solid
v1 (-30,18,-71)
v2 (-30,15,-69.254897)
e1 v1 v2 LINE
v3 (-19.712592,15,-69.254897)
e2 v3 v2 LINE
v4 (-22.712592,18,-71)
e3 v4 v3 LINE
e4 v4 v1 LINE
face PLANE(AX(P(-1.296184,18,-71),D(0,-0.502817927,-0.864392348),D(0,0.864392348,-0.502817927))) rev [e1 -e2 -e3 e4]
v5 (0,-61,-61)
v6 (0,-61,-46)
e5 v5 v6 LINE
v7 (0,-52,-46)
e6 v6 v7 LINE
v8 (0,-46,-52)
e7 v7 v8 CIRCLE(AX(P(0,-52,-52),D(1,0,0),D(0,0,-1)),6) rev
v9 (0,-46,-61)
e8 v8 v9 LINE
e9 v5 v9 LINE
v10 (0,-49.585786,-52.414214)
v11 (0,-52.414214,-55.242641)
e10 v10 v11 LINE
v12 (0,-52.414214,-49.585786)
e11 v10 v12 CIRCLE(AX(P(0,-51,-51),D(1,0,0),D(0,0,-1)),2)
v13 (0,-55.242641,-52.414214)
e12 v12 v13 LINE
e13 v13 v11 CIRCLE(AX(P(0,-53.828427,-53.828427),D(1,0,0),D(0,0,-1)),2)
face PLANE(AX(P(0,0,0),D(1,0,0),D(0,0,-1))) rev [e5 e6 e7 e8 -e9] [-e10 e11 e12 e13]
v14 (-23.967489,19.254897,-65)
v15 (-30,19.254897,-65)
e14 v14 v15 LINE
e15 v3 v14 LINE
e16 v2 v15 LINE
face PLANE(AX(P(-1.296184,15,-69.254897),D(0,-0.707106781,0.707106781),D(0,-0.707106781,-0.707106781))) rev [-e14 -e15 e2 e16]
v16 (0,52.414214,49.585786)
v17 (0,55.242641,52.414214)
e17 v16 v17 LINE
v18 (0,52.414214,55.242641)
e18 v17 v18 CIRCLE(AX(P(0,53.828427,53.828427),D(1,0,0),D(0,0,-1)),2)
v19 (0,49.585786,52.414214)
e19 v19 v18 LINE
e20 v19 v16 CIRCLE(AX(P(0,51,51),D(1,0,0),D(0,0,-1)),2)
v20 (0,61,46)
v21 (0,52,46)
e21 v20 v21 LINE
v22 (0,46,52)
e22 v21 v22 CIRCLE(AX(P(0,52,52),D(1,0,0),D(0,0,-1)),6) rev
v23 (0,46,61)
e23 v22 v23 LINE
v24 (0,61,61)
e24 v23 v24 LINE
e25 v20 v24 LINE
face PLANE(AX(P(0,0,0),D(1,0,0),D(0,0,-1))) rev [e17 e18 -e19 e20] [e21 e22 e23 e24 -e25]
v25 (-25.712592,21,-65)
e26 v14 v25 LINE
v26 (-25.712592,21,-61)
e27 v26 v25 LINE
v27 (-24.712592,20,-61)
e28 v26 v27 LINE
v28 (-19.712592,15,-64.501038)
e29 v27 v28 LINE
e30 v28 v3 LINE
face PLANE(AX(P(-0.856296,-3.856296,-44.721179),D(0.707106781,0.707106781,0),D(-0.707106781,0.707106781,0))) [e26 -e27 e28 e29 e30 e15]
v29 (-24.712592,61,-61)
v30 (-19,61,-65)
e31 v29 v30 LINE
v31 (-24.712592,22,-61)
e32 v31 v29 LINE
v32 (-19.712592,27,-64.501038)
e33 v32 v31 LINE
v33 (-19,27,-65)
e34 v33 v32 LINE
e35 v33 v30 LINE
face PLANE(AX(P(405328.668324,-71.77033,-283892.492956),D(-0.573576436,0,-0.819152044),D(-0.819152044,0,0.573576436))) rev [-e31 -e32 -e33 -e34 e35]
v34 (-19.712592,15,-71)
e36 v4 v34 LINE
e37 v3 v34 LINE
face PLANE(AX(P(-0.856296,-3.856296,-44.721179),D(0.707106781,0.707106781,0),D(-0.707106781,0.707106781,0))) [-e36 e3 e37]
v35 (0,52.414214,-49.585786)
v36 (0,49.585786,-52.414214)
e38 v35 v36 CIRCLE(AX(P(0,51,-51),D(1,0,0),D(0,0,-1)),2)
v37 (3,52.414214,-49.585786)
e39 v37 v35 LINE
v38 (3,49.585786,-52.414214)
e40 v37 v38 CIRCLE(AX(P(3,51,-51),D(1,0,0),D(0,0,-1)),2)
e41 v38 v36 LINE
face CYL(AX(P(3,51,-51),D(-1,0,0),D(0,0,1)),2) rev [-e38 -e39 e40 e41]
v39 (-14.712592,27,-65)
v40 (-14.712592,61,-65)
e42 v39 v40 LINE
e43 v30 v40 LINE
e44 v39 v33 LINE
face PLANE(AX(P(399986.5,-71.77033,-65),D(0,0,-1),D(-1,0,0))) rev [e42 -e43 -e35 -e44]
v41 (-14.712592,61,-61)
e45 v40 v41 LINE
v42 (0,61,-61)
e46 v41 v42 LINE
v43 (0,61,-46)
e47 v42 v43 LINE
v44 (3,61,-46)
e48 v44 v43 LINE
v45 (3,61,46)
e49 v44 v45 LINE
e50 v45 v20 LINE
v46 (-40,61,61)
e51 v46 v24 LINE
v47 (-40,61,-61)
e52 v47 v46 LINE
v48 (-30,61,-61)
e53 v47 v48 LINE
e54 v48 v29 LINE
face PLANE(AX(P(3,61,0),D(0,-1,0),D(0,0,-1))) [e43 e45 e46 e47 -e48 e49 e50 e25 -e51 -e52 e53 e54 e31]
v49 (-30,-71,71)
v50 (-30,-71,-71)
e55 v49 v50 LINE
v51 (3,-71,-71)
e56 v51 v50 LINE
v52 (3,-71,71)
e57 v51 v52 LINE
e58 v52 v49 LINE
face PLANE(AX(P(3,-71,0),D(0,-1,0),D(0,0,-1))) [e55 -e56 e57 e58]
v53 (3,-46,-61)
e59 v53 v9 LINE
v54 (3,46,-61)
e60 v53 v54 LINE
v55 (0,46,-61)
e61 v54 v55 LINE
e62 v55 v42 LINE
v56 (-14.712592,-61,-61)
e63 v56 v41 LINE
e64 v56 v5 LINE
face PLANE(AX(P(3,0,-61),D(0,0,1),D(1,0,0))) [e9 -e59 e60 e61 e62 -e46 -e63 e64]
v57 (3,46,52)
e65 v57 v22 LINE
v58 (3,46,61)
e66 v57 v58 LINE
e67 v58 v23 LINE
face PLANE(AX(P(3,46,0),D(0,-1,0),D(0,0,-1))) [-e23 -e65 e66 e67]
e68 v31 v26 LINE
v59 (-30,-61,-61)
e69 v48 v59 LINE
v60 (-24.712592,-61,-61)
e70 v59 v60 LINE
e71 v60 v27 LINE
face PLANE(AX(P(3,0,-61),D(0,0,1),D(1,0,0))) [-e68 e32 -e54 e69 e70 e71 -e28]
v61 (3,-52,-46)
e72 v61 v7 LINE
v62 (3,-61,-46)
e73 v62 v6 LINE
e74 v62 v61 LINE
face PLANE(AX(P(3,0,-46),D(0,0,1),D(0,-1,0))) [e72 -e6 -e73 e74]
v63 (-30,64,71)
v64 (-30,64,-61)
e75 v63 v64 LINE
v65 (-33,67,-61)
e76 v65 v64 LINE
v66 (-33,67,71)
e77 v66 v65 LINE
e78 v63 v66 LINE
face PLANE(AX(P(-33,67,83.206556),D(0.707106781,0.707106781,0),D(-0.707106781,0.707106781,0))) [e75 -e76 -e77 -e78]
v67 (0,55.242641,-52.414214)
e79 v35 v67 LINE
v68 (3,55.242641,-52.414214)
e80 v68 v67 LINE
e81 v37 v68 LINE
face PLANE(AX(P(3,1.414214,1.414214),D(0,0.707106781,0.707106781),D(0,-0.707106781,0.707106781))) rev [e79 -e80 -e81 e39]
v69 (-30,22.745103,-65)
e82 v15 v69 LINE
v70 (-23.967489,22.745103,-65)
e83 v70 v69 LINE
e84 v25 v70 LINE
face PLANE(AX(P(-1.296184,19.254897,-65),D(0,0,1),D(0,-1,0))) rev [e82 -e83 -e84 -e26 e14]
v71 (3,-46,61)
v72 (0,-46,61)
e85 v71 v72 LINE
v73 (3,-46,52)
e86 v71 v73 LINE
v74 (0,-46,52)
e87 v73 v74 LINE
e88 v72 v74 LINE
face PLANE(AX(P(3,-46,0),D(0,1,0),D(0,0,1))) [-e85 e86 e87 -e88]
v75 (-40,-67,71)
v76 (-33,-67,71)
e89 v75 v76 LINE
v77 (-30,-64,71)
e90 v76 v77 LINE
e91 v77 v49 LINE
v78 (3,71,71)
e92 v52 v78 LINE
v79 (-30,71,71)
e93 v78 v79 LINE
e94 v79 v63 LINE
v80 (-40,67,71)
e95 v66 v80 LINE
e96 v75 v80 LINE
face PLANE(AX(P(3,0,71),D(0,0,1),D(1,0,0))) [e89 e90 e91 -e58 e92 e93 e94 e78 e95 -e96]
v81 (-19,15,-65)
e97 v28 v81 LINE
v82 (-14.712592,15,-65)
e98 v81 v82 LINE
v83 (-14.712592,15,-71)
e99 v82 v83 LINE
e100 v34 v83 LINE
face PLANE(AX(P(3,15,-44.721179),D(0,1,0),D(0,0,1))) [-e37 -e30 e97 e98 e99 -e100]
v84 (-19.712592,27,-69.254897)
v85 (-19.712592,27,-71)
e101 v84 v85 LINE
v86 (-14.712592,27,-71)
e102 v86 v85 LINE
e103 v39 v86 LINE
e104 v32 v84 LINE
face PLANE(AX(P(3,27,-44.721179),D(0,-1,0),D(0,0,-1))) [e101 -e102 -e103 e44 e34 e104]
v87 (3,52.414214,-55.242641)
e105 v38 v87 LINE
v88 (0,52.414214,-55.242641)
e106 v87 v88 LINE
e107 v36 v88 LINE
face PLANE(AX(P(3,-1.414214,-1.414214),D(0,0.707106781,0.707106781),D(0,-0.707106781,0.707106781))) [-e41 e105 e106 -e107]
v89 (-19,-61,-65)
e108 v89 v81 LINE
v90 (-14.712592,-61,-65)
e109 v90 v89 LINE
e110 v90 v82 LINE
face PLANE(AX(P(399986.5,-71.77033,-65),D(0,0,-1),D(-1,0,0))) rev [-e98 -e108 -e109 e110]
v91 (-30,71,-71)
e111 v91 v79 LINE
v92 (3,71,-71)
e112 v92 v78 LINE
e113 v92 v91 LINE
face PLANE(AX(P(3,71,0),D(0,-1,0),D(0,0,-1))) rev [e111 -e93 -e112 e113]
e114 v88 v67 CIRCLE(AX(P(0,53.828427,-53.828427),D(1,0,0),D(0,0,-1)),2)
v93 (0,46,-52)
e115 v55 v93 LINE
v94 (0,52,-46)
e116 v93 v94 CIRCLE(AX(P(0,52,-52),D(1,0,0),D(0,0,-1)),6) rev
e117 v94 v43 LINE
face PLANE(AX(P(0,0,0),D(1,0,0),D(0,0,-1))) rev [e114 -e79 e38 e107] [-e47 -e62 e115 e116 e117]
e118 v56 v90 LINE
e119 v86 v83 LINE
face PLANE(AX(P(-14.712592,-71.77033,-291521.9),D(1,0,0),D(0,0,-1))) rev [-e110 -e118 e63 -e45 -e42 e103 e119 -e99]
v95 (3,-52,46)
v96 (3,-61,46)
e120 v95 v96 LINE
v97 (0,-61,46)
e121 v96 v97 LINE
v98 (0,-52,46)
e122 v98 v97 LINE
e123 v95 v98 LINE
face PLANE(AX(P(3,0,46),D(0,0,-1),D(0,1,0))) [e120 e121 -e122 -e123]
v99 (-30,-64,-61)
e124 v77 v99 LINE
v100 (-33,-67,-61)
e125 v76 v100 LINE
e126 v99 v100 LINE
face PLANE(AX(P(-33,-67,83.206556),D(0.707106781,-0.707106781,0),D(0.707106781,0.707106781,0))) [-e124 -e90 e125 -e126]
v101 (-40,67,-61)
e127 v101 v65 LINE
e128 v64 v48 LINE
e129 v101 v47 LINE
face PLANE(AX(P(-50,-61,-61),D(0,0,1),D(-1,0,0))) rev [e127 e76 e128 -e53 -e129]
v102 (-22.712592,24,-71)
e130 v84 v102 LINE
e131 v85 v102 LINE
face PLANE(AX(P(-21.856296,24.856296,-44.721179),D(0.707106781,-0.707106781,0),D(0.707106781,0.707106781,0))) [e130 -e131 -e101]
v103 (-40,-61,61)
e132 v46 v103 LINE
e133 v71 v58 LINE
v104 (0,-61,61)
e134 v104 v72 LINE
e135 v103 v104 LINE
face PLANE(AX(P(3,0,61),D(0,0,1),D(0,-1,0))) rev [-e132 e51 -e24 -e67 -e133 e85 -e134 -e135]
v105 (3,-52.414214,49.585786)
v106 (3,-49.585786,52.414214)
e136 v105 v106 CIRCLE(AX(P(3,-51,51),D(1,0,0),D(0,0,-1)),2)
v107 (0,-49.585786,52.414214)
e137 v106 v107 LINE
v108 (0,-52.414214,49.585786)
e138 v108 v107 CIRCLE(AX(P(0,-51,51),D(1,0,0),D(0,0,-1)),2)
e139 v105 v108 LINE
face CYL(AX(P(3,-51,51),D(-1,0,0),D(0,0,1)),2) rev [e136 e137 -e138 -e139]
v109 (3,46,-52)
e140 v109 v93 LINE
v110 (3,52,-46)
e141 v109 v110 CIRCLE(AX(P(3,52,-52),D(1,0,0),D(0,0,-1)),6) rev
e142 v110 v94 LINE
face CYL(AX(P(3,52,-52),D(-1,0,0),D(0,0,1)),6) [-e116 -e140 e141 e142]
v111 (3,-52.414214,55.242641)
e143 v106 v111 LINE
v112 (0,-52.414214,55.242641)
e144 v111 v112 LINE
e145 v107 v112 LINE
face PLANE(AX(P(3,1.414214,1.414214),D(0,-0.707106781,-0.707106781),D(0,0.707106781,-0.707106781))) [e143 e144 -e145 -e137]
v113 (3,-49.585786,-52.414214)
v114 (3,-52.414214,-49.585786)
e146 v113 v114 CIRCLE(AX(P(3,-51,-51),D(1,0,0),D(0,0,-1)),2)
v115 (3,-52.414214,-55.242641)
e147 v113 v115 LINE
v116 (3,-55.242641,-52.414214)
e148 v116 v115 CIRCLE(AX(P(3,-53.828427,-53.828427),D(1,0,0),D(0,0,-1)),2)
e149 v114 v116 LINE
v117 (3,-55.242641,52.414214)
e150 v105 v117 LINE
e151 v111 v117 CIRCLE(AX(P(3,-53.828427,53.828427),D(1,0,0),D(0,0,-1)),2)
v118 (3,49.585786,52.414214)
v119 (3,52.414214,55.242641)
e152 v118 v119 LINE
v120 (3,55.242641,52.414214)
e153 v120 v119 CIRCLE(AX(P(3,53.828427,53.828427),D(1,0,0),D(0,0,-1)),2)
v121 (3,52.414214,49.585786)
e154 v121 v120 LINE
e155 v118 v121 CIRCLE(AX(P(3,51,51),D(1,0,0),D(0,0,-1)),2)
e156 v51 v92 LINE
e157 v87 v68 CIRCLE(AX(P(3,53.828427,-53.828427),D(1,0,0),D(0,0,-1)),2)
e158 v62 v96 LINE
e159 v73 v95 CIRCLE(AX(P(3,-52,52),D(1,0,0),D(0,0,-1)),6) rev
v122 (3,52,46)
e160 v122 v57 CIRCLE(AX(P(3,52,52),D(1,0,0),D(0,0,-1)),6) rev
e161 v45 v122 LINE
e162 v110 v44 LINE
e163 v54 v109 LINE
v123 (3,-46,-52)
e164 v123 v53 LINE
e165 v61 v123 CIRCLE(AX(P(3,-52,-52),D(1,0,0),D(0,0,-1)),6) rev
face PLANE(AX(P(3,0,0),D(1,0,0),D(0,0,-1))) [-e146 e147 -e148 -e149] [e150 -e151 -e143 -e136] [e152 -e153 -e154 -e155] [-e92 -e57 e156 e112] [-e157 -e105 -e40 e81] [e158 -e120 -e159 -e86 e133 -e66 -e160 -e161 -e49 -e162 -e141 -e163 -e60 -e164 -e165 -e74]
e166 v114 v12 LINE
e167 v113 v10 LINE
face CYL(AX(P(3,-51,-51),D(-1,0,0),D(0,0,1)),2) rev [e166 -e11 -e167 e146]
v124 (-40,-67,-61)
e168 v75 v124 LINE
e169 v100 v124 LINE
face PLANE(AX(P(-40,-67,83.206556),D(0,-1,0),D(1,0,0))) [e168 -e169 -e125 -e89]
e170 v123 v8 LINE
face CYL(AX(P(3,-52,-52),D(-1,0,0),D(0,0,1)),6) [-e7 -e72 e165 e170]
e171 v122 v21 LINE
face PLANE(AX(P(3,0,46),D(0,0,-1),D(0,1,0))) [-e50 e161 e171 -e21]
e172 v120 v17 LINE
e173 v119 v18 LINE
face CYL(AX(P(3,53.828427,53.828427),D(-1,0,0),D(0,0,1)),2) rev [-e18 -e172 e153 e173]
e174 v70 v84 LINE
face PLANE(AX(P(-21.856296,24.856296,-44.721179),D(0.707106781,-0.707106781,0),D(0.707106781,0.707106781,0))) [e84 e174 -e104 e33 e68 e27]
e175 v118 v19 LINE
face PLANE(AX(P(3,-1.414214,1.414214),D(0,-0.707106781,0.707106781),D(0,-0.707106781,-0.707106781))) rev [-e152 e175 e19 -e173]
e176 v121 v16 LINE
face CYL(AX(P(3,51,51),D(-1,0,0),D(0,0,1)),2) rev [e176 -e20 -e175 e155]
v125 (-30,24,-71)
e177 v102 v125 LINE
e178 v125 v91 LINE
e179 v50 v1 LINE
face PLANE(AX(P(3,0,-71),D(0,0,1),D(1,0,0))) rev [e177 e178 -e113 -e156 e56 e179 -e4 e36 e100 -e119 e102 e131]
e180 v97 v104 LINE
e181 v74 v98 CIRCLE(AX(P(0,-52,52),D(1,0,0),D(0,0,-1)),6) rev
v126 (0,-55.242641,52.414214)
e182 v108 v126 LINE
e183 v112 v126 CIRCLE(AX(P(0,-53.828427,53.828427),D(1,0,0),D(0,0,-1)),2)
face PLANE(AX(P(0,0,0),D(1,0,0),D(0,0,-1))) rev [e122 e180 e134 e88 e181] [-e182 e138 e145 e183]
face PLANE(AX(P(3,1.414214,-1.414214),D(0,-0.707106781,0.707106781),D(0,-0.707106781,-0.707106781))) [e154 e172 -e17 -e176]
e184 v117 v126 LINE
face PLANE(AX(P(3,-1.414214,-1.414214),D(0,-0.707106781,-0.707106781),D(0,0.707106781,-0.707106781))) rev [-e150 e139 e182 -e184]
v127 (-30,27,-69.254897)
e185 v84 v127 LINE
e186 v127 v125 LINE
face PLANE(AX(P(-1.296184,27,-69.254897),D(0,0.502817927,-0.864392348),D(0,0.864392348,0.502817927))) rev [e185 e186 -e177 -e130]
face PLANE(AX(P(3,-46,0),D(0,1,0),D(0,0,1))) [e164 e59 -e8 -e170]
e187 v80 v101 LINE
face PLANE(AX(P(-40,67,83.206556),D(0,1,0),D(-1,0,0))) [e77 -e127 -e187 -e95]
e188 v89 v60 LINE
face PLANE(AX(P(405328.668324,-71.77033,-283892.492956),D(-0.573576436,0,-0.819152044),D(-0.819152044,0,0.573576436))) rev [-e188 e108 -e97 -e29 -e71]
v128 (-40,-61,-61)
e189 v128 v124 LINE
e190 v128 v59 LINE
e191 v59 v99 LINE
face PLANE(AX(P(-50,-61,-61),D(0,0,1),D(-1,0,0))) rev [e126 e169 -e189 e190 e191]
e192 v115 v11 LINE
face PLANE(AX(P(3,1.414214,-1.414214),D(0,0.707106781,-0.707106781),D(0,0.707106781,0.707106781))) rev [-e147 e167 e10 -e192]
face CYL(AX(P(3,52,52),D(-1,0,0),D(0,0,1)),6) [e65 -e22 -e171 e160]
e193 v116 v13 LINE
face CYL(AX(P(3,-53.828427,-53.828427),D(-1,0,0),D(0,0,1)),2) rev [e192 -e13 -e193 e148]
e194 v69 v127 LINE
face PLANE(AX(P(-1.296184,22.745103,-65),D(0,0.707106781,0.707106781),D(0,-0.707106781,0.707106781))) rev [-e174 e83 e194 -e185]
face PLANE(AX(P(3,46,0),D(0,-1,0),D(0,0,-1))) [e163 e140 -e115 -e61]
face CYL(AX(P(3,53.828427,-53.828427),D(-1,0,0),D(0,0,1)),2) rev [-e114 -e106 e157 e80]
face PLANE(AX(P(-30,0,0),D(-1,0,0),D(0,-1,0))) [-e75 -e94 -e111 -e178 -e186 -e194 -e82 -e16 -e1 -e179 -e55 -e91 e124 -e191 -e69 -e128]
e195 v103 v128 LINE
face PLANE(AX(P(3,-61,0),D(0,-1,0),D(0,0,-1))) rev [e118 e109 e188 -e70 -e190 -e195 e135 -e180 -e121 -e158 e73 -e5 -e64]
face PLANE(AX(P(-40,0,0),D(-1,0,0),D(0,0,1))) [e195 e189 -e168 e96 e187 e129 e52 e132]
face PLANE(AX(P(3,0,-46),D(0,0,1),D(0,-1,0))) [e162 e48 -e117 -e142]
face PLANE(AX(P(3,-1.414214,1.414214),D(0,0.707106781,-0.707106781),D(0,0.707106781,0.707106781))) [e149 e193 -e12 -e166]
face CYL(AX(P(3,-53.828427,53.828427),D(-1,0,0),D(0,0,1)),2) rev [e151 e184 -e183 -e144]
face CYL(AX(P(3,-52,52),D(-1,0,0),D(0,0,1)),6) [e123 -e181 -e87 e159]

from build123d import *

# Parameters (mm, degrees)
SKETCH2_W           = 142
SKETCH2_H           = 142
SKETCH2_W_2         = 122
SKETCH2_H_2         = 122
BOSS_EXTRUDE1_DEPTH = 3
SKETCH2_4_W         = 142
SKETCH2_4_H         = 142
SKETCH2_4_W_2       = 122
SKETCH2_4_H_2       = 122
BOSS_EXTRUDE2_DEPTH = 30
BOSS_EXTRUDE3_DEPTH = 10
CUT_EXTRUDE5_START  = -132
CUT_EXTRUDE5_DEPTH  = 122
SKETCH15_W          = 122
SKETCH15_H          = 10
BOSS_EXTRUDE4_DEPTH = 10
CAVITY2_START       = -40
CAVITY2_DEPTH       = 10
CAVITY2_START_2     = -61
CAVITY2_2_DEPTH     = 133
CUT_EXTRUDE8_DEPTH  = 25.287407973
CUT_EXTRUDE9_START  = -6
CUT_EXTRUDE9_DEPTH  = 10


with BuildPart() as part:
    # Sketch2 → Boss-Extrude1 (new body)
    # profile 1 of 5: a face of its own
    with BuildSketch(Plane.YZ):
        Rectangle(SKETCH2_W, SKETCH2_H)
        Rectangle(SKETCH2_W_2, SKETCH2_H_2, mode=Mode.SUBTRACT)
    # profile 2 of 5: a face of its own
    with BuildSketch(Plane.YZ):
        with BuildLine():
            Line((-61, 61), (-61, 46))
            Line((-61, 46), (-52, 46))
            ThreePointArc((-52, 46), (-47.757359313, 47.757359313), (-46, 52))
            Line((-46, 52), (-46, 61))
            Line((-46, 61), (-61, 61))
        make_face()
        with BuildLine():
            ThreePointArc((-49.585786438, 52.414213562), (-49.585786438, 49.585786438), (-52.414213562, 49.585786438))
            Line((-52.414213562, 49.585786438), (-55.242640687, 52.414213562))
            ThreePointArc((-55.242640687, 52.414213562), (-55.242640687, 55.242640687), (-52.414213562, 55.242640687))
            Line((-52.414213562, 55.242640687), (-49.585786438, 52.414213562))
        make_face(mode=Mode.SUBTRACT)
    # profile 3 of 5: a face of its own
    with BuildSketch(Plane.YZ):
        with BuildLine():
            Line((52, 46), (61, 46))
            Line((61, 46), (61, 61))
            Line((61, 61), (46, 61))
            Line((46, 61), (46, 52))
            ThreePointArc((46, 52), (47.757359313, 47.757359313), (52, 46))
        make_face()
        with BuildLine():
            ThreePointArc((52.414213562, 49.585786438), (49.585786438, 49.585786438), (49.585786438, 52.414213562))
            Line((49.585786438, 52.414213562), (52.414213562, 55.242640687))
            ThreePointArc((52.414213562, 55.242640687), (55.242640687, 55.242640687), (55.242640687, 52.414213562))
            Line((55.242640687, 52.414213562), (52.414213562, 49.585786438))
        make_face(mode=Mode.SUBTRACT)
    # profile 4 of 5: a face of its own
    with BuildSketch(Plane.YZ):
        with BuildLine():
            Line((46, -52), (46, -61))
            Line((46, -61), (61, -61))
            Line((61, -61), (61, -46))
            Line((61, -46), (52, -46))
            ThreePointArc((52, -46), (47.757359313, -47.757359313), (46, -52))
        make_face()
        with BuildLine():
            ThreePointArc((49.585786438, -52.414213562), (49.585786438, -49.585786438), (52.414213562, -49.585786438))
            Line((52.414213562, -49.585786438), (55.242640687, -52.414213562))
            ThreePointArc((55.242640687, -52.414213562), (55.242640687, -55.242640687), (52.414213562, -55.242640687))
            Line((52.414213562, -55.242640687), (49.585786438, -52.414213562))
        make_face(mode=Mode.SUBTRACT)
    # profile 5 of 5: a face of its own
    with BuildSketch(Plane.YZ):
        with BuildLine():
            Line((-61, -46), (-61, -61))
            Line((-61, -61), (-46, -61))
            Line((-46, -61), (-46, -52))
            ThreePointArc((-46, -52), (-47.757359313, -47.757359313), (-52, -46))
            Line((-52, -46), (-61, -46))
        make_face()
        with BuildLine():
            ThreePointArc((-52.414213562, -49.585786438), (-49.585786438, -49.585786438), (-49.585786438, -52.414213562))
            Line((-49.585786438, -52.414213562), (-52.414213562, -55.242640687))
            ThreePointArc((-52.414213562, -55.242640687), (-55.242640687, -55.242640687), (-55.242640687, -52.414213562))
            Line((-55.242640687, -52.414213562), (-52.414213562, -49.585786438))
        make_face(mode=Mode.SUBTRACT)
    extrude(amount=BOSS_EXTRUDE1_DEPTH)

    # Sketch2<4> → Boss-Extrude2 (add)
    with BuildSketch(Plane.YZ):
        Rectangle(SKETCH2_4_W, SKETCH2_4_H)
        Rectangle(SKETCH2_4_W_2, SKETCH2_4_H_2, mode=Mode.SUBTRACT)
    extrude(amount=-BOSS_EXTRUDE2_DEPTH)

    # Sketch3 → Boss-Extrude3 (add)
    with BuildSketch(Plane(origin=(-30, 0, 0), x_dir=(0, -1, 0), z_dir=(-1, 0, 0))):
        Polygon((-61, -61), (-61, 61), (-61, 71), (-71, 71), (-71, -71), (71, -71), (71, 71), (61, 71), (61, 61), (61, -61), align=None)
    extrude(amount=BOSS_EXTRUDE3_DEPTH)

    # Sketch11 → Cut-Extrude5 (cut)
    with BuildSketch(Plane(origin=(0, 71, 0), x_dir=(-1, 0, 0), z_dir=(0, 1, 0)).offset(CUT_EXTRUDE5_START)):
        Polygon((14.712592027, -65), (19, -65), (24.712592027, -61), (14.712592027, -61), align=None)
    extrude(amount=CUT_EXTRUDE5_DEPTH, mode=Mode.SUBTRACT)

    # Sketch15 → Boss-Extrude4 (add)
    with BuildSketch(Plane(origin=(-30, 0, 0), x_dir=(0, -1, 0), z_dir=(-1, 0, 0))):
        with Locations((0, 66)):
            Rectangle(SKETCH15_W, SKETCH15_H)
    extrude(amount=BOSS_EXTRUDE4_DEPTH)

    # Cavity2: read off the stored shape, not the designer's step
    # Cavity2 outline → Cavity2 (cut)
    with BuildSketch(Plane.YZ.offset(CAVITY2_START)):
        Polygon((19.254896882, -65), (22.745103118, -65), (27, -69.254896882), (24, -71), (71, -71), (71, 71), (67, 71), (67, -61), (-67, -61), (-67, 71), (-71, 71), (-71, -71), (18, -71), (15, -69.254896882), align=None)
    extrude(amount=CAVITY2_DEPTH, mode=Mode.SUBTRACT)

    # Cavity2 2 outline → Cavity2 2 (cut)
    with BuildSketch(Plane.XY.offset(CAVITY2_START_2)):
        Polygon((-30, -67), (-30, -64), (-33, -67), align=None)
        Polygon((-30, 64), (-30, 67), (-33, 67), align=None)
    extrude(amount=CAVITY2_2_DEPTH, mode=Mode.SUBTRACT)

    # Sketch16 → Cut-Extrude8 (cut)
    with BuildSketch(Plane(origin=(-40, 0, 0), x_dir=(0, -1, 0), z_dir=(-1, 0, 0))):
        Polygon((-22.745103118, -65), (-27, -69.254896882), (-24, -71), (-18, -71), (-15, -69.254896882), (-19.254896882, -65), align=None)
    extrude(amount=-CUT_EXTRUDE8_DEPTH, mode=Mode.SUBTRACT)

    # Sketch14 → Cut-Extrude9 (cut)
    with BuildSketch(Plane.XY.offset(-65).offset(CUT_EXTRUDE9_START)):
        Polygon((-19.712592027, 15), (-14.712592027, 15), (-14.712592027, 27), (-19.712592027, 27), (-25.712592027, 21), align=None)
    extrude(amount=CUT_EXTRUDE9_DEPTH, mode=Mode.SUBTRACT)


solid = part.part
